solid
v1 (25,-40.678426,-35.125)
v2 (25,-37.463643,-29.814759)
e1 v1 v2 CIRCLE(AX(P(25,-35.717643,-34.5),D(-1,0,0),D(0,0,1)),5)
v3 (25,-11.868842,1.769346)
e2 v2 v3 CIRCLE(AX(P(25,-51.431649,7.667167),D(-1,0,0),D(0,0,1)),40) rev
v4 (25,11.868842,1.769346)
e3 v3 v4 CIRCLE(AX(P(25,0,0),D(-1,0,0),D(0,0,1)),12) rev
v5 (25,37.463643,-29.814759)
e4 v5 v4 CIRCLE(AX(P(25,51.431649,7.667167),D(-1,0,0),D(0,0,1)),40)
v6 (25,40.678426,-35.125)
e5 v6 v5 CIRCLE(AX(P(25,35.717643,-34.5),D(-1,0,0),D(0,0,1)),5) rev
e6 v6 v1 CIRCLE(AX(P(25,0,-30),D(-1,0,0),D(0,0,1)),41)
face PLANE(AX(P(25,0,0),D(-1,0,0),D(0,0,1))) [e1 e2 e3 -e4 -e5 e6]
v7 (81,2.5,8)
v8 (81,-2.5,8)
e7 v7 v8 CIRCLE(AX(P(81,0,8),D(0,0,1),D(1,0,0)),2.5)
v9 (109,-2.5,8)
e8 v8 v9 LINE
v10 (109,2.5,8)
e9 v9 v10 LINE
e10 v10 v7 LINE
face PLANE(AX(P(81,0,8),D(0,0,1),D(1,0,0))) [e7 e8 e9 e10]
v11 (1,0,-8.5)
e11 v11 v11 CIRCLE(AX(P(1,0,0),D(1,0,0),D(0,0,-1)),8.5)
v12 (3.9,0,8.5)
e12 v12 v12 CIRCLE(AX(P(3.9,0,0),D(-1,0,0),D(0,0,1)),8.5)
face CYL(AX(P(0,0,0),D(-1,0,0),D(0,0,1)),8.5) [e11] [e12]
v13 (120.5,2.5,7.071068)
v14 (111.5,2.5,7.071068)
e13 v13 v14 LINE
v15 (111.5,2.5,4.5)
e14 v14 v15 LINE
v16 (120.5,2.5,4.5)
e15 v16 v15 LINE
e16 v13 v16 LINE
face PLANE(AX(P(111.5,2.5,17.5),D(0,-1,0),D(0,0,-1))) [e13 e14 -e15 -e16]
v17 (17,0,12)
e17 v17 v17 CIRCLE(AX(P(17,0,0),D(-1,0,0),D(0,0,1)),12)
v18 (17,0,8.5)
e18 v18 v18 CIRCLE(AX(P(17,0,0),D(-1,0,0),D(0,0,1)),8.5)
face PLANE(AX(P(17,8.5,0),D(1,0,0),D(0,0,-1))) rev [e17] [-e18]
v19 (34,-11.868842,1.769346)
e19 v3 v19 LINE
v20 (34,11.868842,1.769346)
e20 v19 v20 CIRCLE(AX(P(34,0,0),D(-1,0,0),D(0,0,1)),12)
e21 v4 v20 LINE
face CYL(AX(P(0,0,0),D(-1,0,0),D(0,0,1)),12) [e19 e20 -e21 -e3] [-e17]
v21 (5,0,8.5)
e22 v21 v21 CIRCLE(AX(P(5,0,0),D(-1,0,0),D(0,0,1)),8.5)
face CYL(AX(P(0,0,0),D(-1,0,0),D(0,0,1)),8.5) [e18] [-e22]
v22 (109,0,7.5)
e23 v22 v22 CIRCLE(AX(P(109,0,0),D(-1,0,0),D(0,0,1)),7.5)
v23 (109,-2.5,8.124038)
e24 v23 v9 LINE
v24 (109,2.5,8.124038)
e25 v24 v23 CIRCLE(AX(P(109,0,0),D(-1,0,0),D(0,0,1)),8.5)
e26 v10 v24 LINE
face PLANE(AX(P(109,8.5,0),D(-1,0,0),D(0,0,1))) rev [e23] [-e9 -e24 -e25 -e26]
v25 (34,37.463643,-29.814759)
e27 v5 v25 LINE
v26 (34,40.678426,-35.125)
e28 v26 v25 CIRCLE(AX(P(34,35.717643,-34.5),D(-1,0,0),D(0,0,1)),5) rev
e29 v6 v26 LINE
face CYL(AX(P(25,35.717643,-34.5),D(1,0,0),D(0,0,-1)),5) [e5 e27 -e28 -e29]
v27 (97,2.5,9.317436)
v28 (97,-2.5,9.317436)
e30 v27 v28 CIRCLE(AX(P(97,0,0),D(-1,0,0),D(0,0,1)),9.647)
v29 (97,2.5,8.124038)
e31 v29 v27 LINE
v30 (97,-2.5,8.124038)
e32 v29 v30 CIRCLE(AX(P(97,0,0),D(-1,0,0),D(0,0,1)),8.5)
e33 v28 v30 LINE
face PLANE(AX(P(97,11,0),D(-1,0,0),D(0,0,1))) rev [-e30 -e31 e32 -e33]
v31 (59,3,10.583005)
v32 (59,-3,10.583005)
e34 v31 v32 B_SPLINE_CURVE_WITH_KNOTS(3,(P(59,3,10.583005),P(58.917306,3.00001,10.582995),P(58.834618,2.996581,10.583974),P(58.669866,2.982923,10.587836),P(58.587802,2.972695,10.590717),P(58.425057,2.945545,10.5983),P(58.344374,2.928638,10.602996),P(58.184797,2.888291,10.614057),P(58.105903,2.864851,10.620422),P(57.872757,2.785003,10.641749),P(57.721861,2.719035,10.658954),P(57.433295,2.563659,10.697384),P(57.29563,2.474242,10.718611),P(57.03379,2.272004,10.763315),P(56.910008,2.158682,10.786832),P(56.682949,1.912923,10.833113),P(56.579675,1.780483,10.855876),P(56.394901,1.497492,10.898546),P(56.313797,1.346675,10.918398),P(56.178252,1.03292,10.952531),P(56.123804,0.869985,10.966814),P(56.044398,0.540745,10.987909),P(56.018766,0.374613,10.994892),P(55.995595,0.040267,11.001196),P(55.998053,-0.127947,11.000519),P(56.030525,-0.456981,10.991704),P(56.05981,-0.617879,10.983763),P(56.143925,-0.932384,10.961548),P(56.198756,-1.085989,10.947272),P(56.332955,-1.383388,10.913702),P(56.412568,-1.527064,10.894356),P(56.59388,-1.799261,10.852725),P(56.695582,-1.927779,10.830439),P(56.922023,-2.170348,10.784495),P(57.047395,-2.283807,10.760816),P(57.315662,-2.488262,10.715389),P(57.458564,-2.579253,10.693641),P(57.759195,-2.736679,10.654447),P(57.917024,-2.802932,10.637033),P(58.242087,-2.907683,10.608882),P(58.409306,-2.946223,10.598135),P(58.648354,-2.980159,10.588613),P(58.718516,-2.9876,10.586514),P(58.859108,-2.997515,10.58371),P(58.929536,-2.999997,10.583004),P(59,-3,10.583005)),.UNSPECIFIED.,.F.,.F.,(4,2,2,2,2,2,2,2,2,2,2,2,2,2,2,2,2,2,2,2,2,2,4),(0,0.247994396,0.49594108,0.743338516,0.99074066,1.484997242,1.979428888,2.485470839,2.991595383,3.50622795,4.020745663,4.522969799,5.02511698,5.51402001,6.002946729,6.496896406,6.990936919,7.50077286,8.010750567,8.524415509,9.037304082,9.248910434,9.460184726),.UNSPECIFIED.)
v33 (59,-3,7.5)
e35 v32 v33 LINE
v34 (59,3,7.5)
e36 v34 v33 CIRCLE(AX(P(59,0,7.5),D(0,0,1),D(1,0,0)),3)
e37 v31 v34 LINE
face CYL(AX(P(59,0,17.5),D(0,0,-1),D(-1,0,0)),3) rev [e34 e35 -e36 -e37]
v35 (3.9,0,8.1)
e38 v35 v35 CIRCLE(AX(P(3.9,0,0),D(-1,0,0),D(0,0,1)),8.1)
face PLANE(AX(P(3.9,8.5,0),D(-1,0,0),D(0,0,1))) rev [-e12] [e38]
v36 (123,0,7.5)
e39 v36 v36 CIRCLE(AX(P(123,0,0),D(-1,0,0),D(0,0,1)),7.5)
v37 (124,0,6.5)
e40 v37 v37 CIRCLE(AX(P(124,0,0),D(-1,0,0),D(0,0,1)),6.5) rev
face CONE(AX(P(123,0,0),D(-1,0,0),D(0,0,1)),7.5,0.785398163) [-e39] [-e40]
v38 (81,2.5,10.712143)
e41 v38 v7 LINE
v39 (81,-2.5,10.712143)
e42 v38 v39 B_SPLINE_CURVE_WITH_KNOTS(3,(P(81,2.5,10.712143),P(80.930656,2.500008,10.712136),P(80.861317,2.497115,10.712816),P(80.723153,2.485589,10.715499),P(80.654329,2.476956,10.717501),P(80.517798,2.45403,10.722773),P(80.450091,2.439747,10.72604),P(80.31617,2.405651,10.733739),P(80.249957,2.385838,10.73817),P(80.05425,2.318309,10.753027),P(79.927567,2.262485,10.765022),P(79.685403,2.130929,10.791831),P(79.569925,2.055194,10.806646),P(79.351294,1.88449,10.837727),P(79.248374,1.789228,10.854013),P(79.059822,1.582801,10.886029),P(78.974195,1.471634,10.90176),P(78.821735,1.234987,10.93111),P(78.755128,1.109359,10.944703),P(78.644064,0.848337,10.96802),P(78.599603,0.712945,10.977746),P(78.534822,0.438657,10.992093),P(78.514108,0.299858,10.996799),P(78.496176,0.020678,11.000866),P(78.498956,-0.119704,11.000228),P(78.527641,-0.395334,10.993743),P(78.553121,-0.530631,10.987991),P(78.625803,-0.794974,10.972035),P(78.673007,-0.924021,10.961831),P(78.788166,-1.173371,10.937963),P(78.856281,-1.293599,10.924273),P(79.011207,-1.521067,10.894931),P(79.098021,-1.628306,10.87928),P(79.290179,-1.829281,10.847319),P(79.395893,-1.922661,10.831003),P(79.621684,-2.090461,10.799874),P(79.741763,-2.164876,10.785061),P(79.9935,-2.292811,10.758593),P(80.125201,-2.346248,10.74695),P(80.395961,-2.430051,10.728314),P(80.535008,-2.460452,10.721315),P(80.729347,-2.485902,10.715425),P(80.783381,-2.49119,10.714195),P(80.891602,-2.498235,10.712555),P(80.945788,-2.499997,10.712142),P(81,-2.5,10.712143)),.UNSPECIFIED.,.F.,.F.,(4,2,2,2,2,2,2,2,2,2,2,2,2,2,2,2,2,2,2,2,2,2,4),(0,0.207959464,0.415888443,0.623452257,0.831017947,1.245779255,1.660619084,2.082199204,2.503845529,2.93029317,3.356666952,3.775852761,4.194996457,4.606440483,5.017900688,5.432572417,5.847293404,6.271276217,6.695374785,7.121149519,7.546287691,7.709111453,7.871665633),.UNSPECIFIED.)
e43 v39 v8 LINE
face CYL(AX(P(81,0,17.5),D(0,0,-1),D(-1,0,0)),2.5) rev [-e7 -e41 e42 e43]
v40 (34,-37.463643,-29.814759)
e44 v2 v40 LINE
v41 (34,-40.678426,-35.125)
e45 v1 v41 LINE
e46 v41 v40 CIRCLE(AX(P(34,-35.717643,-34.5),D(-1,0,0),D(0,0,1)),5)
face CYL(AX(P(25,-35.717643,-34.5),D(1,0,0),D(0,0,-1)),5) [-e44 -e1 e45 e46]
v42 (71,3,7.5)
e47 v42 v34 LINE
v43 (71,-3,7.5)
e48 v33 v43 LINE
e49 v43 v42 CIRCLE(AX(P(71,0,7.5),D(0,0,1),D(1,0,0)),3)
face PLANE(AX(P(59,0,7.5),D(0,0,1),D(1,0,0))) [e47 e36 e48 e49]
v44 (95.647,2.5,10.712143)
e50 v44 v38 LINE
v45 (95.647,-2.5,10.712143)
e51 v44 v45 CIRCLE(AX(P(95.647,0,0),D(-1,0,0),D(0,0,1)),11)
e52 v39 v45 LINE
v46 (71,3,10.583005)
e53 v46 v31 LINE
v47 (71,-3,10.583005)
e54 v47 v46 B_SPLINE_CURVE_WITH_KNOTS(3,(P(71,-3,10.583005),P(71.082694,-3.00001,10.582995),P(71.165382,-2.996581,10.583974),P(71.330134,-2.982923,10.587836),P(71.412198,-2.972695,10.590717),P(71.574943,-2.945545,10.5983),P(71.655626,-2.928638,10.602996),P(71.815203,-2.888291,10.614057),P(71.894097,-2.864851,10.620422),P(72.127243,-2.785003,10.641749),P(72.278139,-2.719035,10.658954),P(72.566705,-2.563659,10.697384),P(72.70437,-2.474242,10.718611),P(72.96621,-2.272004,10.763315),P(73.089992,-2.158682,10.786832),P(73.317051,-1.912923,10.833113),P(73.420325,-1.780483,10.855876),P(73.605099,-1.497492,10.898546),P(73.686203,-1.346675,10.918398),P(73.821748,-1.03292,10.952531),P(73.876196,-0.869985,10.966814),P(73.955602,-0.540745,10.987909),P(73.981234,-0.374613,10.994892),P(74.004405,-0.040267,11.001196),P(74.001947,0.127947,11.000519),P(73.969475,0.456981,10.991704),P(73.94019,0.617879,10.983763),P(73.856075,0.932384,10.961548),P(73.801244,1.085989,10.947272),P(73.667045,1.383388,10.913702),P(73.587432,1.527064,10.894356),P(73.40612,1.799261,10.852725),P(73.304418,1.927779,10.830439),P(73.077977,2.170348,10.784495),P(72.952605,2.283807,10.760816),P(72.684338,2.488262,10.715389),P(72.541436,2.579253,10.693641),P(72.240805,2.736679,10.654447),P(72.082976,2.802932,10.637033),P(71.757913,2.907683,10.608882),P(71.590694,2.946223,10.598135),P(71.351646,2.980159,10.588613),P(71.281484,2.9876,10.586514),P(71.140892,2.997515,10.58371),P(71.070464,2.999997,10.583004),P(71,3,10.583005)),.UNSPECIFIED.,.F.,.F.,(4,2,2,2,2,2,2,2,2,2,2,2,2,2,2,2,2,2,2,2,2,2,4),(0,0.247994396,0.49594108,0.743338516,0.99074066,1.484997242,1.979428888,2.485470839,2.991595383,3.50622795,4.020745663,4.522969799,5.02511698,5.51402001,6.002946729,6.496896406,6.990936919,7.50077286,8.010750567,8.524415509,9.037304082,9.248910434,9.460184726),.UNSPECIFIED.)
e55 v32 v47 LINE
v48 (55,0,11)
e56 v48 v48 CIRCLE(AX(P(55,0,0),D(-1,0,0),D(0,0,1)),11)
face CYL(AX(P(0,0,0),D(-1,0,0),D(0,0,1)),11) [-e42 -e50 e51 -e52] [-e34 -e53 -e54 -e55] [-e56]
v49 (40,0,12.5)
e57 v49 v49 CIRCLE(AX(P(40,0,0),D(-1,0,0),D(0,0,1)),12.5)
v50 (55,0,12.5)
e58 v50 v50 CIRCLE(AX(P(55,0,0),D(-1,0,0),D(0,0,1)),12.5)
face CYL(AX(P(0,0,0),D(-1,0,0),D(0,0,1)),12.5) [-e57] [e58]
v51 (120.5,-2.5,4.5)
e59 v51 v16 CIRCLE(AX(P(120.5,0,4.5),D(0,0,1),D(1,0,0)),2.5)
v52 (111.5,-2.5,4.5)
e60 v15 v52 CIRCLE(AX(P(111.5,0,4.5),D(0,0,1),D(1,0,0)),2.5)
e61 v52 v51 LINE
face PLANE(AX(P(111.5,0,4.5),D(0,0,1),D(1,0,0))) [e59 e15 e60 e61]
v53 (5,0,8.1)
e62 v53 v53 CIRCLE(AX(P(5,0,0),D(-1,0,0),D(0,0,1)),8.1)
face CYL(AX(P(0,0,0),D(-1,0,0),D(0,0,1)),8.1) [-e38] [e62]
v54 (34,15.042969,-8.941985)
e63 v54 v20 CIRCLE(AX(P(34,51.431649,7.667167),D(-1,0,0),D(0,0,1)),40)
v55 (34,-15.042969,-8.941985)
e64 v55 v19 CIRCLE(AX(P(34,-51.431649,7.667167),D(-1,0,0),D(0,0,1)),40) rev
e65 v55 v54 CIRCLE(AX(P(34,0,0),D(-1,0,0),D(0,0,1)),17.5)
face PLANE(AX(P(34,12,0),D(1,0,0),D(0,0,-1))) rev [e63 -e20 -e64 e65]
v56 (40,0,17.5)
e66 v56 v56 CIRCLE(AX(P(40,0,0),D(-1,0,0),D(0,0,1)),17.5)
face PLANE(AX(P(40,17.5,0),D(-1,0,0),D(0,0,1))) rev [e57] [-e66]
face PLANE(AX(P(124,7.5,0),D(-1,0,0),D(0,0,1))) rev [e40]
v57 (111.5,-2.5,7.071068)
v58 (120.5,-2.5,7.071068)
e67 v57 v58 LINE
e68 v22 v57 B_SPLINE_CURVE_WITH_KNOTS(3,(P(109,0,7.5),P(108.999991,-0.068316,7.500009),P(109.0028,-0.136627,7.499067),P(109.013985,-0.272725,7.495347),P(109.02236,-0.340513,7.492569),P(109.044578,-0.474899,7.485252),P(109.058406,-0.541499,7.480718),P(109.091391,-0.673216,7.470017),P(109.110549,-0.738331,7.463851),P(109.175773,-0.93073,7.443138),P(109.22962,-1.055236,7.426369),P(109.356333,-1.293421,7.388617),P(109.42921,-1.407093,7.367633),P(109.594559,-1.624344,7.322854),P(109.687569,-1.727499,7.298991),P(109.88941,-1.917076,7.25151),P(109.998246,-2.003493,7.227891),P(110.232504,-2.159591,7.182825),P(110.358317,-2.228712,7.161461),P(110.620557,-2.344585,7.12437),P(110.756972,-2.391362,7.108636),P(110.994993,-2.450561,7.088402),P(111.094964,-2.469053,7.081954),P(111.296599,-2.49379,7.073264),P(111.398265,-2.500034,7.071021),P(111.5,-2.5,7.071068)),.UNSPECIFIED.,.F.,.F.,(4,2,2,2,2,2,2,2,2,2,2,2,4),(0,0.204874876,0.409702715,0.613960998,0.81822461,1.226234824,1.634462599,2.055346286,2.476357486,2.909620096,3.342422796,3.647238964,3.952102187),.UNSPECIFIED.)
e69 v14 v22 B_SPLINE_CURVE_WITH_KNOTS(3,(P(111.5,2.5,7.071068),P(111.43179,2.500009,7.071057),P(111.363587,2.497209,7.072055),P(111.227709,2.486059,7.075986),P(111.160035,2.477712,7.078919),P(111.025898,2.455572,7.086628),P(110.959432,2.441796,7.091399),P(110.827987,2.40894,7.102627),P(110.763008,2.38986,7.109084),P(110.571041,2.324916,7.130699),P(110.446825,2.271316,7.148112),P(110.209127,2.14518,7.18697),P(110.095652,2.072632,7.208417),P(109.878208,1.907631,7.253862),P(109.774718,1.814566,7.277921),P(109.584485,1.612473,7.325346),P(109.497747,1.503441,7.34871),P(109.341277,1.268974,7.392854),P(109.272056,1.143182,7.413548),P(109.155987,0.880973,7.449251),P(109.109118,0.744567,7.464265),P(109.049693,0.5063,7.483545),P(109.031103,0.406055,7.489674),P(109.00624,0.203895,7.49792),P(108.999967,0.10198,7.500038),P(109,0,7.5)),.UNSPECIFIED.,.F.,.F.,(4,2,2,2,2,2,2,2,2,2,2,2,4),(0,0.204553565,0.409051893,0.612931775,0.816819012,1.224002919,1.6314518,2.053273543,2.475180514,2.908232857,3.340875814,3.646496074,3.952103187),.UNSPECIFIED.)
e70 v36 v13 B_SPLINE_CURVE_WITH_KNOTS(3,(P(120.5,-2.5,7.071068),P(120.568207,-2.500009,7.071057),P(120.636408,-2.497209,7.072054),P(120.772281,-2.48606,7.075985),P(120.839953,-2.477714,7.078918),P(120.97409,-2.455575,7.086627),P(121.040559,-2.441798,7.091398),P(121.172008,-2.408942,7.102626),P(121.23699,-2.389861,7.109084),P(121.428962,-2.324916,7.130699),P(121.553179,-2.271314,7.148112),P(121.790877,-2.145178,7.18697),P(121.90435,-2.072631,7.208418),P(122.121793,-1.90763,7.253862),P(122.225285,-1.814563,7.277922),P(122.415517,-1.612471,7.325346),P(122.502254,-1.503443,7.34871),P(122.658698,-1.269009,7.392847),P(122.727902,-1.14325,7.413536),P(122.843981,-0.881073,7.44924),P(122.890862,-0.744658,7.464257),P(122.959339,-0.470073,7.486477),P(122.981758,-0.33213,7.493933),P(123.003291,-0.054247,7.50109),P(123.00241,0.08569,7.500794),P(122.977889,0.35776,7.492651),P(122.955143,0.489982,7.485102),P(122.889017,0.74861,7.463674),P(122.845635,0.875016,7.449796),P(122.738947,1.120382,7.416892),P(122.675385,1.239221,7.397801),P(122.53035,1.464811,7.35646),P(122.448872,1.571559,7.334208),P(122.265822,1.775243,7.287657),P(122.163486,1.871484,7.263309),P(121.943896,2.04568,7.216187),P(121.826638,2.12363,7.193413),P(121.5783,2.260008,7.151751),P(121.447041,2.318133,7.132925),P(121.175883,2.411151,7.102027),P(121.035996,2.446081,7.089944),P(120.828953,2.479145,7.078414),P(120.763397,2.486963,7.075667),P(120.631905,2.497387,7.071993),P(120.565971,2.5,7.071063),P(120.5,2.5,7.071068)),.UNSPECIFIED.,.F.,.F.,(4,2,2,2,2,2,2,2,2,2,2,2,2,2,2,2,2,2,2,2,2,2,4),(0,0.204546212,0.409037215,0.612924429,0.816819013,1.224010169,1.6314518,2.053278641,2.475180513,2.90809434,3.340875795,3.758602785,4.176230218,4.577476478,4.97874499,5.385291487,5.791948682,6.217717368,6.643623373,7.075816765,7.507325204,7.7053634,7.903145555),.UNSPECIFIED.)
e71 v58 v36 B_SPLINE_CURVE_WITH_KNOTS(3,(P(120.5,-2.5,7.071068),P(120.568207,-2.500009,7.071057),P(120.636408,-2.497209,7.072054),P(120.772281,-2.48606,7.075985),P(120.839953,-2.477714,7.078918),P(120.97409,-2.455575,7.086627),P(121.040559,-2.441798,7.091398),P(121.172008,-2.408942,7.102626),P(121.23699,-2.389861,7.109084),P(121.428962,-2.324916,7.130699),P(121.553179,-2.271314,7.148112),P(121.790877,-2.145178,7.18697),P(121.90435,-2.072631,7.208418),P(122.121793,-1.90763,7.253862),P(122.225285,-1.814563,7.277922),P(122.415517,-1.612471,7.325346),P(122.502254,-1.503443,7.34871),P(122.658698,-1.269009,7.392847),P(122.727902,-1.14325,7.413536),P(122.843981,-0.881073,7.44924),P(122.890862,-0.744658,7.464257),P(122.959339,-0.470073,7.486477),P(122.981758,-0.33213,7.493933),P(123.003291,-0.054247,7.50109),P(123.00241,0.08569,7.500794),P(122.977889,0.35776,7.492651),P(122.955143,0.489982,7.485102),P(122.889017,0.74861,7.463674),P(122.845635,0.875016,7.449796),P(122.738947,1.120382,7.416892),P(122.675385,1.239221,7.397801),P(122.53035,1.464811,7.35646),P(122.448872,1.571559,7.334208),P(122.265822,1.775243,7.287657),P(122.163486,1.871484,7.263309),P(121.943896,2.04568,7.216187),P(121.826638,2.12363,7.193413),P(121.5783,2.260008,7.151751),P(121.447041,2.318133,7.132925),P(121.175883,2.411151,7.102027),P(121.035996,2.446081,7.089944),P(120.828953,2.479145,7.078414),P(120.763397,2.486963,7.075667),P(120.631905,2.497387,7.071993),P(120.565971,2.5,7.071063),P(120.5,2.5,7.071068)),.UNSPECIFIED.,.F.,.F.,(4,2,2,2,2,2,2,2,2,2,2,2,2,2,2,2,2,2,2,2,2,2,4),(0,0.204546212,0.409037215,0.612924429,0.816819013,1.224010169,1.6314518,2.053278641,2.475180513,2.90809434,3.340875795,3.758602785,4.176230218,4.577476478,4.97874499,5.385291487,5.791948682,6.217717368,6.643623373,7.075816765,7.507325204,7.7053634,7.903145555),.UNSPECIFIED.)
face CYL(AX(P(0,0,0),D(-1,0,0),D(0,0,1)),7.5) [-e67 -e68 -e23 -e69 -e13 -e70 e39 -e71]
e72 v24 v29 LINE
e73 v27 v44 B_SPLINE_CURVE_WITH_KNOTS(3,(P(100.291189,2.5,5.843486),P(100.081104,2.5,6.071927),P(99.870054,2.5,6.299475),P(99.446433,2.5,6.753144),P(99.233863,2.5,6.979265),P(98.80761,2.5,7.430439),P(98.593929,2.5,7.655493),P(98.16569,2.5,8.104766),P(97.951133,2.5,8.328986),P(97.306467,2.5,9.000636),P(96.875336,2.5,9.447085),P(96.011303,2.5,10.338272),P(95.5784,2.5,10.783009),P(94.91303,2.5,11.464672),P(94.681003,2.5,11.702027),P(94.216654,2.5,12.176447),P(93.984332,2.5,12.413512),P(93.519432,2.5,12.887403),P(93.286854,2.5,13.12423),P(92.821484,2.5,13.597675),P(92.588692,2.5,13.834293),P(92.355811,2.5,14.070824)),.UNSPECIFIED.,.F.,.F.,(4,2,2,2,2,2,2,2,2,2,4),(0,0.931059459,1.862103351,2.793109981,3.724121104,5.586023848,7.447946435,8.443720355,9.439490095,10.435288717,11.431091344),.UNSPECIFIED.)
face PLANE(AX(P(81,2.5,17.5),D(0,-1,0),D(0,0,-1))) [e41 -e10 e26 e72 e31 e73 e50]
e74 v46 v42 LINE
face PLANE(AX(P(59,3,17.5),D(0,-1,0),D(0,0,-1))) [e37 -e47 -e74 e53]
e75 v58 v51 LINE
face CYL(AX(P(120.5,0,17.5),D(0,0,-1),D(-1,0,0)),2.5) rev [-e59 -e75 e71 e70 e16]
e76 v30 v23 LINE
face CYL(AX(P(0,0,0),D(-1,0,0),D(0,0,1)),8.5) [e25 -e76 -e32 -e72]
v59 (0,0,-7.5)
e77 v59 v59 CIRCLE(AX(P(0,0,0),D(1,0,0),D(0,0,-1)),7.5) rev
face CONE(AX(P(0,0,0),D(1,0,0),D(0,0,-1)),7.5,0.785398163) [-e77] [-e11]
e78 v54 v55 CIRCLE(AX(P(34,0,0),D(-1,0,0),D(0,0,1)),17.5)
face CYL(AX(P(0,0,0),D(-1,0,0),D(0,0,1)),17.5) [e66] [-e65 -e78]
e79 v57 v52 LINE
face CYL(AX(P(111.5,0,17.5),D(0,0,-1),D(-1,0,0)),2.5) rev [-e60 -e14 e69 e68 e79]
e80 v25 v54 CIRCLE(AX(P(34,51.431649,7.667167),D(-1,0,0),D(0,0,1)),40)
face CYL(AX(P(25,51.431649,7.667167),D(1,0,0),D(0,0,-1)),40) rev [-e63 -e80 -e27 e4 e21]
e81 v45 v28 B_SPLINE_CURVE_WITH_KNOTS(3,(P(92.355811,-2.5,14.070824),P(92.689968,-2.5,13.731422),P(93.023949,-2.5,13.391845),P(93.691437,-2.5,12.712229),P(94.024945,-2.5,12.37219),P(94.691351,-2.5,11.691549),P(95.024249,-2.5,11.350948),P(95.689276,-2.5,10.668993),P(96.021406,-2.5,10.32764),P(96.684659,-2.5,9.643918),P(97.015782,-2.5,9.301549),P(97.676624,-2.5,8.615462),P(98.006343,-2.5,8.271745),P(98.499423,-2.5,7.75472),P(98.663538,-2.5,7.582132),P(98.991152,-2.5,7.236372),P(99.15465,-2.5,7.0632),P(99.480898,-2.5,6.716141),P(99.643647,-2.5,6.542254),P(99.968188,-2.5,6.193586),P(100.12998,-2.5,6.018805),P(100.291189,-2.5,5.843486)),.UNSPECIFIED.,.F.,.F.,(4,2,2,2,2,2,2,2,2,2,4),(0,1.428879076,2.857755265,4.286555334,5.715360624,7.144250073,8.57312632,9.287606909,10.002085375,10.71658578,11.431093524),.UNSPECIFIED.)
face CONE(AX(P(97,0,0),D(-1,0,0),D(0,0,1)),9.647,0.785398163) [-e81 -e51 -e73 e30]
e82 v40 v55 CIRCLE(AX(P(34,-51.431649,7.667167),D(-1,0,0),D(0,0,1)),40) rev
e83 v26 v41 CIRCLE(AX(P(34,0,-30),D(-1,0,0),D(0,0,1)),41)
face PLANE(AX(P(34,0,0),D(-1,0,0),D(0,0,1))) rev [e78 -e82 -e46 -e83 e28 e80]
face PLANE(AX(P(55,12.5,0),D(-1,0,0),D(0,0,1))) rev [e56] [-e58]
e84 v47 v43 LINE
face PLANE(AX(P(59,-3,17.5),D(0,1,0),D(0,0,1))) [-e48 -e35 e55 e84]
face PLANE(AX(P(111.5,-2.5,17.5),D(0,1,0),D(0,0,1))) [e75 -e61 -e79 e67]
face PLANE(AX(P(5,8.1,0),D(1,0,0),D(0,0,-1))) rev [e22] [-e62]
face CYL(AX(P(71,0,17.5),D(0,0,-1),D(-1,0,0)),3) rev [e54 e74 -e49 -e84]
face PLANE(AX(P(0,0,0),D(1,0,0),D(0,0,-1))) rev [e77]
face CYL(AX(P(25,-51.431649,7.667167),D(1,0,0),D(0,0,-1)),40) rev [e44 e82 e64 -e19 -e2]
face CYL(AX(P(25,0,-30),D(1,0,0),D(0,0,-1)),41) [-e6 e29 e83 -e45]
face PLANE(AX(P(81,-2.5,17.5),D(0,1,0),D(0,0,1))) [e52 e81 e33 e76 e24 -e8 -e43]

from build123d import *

# Parameters (mm, degrees)
EXTRUDE_1_DEPTH     = 9
CUT_EXTRUDE_START   = 7.5
CUT_EXTRUDE_1_DEPTH = 142.076331988
CUT_EXTRUDE_START_2 = 8
CUT_EXTRUDE_2_DEPTH = 141.576331988
CUT_EXTRUDE_START_3 = 4.5
CUT_EXTRUDE_3_DEPTH = 145.076331988
CHAMFER_1_SIZE      = 1


# Read off the part's stored shape, not the designer's step: M22 机械螺纹 螺柱1
with BuildPart() as part:
    # 草图1 → 旋转1 (revolve)
    with BuildSketch(Plane.XY, mode=Mode.PRIVATE) as revolve_1_sk:
        Polygon((0, 0), (0, 8.5), (3.9, 8.5), (3.9, 8.1), (5, 8.1), (5, 8.5), (17, 8.5), (17, 12), (34, 12), (34, 17.5), (40, 17.5), (40, 12.5), (55, 12.5), (55, 11), (97, 11), (97, 8.5), (109, 8.5), (109, 7.5), (124, 7.5), (124, 0), align=None)
    revolve(revolve_1_sk.sketch.rotate(Axis((0, 0, 0), (1, 0, 0)), 90), axis=Axis((0, 0, 0), (1, 0, 0)))

    # 草图2 → 凸台-拉伸1 (add)
    with BuildSketch(Plane.ZY.offset(-34)):
        with BuildLine():
            ThreePointArc((1.769346299, -11.868842137), (-12, 0), (1.769346299, 11.868842137))
            ThreePointArc((1.769346299, 11.868842137), (-17.516638735, 20.354713861), (-29.814759189, 37.463643428))
            ThreePointArc((-29.814759189, 37.463643428), (-31.910579937, 39.994896928), (-35.125, 40.678426408))
            ThreePointArc((-35.125, 40.678426408), (-71, 0), (-35.125, -40.678426408))
            ThreePointArc((-35.125, -40.678426408), (-31.910579937, -39.994896928), (-29.814759189, -37.463643428))
            ThreePointArc((-29.814759189, -37.463643428), (-17.516638735, -20.354713861), (1.769346299, -11.868842137))
        make_face()
    extrude(amount=EXTRUDE_1_DEPTH)

    # 草图3 → 切除-拉伸1 (cut, through all)
    with BuildSketch(Plane.XY.offset(CUT_EXTRUDE_START)):
        with BuildLine():
            Line((59, 3), (71, 3))
            ThreePointArc((71, 3), (74, 0), (71, -3))
            Line((71, -3), (59, -3))
            ThreePointArc((59, -3), (56, 0), (59, 3))
        make_face()
    extrude(amount=CUT_EXTRUDE_1_DEPTH, mode=Mode.SUBTRACT)

    # M22 机械螺纹 螺柱1 outline → M22 机械螺纹 螺柱1 (revolve, cut)
    with BuildSketch(Plane.YX):
        Polygon((11, 97), (9.647, 97), (11, 95.647), align=None)
    revolve(axis=Axis((0, 0, 0), (1, 0, 0)), mode=Mode.SUBTRACT)

    # 草图4 → 切除-拉伸2 (cut, through all)
    with BuildSketch(Plane.XY.offset(CUT_EXTRUDE_START_2)):
        with BuildLine():
            Line((81, 2.5), (110.572522736, 2.5))
            ThreePointArc((110.572522736, 2.5), (113.072522736, 0), (110.572522736, -2.5))
            Line((110.572522736, -2.5), (81, -2.5))
            ThreePointArc((81, -2.5), (78.5, 0), (81, 2.5))
        make_face()
    extrude(amount=CUT_EXTRUDE_2_DEPTH, mode=Mode.SUBTRACT)

    # 草图6 → 切除-拉伸3 (cut, through all)
    with BuildSketch(Plane.XY.offset(CUT_EXTRUDE_START_3)):
        with BuildLine():
            Line((111.5, 2.5), (120.5, 2.5))
            ThreePointArc((120.5, 2.5), (123, 0), (120.5, -2.5))
            Line((120.5, -2.5), (111.5, -2.5))
            ThreePointArc((111.5, -2.5), (109, 0), (111.5, 2.5))
        make_face()
    extrude(amount=CUT_EXTRUDE_3_DEPTH, mode=Mode.SUBTRACT)

    # 倒角1
    chamfer_1_edges = [part.edges().sort_by_distance(p)[0] for p in [
        (124, 0, -7.5),
        (0, 0, -8.5),
    ]]
    chamfer(chamfer_1_edges, length=CHAMFER_1_SIZE)


solid = part.part
